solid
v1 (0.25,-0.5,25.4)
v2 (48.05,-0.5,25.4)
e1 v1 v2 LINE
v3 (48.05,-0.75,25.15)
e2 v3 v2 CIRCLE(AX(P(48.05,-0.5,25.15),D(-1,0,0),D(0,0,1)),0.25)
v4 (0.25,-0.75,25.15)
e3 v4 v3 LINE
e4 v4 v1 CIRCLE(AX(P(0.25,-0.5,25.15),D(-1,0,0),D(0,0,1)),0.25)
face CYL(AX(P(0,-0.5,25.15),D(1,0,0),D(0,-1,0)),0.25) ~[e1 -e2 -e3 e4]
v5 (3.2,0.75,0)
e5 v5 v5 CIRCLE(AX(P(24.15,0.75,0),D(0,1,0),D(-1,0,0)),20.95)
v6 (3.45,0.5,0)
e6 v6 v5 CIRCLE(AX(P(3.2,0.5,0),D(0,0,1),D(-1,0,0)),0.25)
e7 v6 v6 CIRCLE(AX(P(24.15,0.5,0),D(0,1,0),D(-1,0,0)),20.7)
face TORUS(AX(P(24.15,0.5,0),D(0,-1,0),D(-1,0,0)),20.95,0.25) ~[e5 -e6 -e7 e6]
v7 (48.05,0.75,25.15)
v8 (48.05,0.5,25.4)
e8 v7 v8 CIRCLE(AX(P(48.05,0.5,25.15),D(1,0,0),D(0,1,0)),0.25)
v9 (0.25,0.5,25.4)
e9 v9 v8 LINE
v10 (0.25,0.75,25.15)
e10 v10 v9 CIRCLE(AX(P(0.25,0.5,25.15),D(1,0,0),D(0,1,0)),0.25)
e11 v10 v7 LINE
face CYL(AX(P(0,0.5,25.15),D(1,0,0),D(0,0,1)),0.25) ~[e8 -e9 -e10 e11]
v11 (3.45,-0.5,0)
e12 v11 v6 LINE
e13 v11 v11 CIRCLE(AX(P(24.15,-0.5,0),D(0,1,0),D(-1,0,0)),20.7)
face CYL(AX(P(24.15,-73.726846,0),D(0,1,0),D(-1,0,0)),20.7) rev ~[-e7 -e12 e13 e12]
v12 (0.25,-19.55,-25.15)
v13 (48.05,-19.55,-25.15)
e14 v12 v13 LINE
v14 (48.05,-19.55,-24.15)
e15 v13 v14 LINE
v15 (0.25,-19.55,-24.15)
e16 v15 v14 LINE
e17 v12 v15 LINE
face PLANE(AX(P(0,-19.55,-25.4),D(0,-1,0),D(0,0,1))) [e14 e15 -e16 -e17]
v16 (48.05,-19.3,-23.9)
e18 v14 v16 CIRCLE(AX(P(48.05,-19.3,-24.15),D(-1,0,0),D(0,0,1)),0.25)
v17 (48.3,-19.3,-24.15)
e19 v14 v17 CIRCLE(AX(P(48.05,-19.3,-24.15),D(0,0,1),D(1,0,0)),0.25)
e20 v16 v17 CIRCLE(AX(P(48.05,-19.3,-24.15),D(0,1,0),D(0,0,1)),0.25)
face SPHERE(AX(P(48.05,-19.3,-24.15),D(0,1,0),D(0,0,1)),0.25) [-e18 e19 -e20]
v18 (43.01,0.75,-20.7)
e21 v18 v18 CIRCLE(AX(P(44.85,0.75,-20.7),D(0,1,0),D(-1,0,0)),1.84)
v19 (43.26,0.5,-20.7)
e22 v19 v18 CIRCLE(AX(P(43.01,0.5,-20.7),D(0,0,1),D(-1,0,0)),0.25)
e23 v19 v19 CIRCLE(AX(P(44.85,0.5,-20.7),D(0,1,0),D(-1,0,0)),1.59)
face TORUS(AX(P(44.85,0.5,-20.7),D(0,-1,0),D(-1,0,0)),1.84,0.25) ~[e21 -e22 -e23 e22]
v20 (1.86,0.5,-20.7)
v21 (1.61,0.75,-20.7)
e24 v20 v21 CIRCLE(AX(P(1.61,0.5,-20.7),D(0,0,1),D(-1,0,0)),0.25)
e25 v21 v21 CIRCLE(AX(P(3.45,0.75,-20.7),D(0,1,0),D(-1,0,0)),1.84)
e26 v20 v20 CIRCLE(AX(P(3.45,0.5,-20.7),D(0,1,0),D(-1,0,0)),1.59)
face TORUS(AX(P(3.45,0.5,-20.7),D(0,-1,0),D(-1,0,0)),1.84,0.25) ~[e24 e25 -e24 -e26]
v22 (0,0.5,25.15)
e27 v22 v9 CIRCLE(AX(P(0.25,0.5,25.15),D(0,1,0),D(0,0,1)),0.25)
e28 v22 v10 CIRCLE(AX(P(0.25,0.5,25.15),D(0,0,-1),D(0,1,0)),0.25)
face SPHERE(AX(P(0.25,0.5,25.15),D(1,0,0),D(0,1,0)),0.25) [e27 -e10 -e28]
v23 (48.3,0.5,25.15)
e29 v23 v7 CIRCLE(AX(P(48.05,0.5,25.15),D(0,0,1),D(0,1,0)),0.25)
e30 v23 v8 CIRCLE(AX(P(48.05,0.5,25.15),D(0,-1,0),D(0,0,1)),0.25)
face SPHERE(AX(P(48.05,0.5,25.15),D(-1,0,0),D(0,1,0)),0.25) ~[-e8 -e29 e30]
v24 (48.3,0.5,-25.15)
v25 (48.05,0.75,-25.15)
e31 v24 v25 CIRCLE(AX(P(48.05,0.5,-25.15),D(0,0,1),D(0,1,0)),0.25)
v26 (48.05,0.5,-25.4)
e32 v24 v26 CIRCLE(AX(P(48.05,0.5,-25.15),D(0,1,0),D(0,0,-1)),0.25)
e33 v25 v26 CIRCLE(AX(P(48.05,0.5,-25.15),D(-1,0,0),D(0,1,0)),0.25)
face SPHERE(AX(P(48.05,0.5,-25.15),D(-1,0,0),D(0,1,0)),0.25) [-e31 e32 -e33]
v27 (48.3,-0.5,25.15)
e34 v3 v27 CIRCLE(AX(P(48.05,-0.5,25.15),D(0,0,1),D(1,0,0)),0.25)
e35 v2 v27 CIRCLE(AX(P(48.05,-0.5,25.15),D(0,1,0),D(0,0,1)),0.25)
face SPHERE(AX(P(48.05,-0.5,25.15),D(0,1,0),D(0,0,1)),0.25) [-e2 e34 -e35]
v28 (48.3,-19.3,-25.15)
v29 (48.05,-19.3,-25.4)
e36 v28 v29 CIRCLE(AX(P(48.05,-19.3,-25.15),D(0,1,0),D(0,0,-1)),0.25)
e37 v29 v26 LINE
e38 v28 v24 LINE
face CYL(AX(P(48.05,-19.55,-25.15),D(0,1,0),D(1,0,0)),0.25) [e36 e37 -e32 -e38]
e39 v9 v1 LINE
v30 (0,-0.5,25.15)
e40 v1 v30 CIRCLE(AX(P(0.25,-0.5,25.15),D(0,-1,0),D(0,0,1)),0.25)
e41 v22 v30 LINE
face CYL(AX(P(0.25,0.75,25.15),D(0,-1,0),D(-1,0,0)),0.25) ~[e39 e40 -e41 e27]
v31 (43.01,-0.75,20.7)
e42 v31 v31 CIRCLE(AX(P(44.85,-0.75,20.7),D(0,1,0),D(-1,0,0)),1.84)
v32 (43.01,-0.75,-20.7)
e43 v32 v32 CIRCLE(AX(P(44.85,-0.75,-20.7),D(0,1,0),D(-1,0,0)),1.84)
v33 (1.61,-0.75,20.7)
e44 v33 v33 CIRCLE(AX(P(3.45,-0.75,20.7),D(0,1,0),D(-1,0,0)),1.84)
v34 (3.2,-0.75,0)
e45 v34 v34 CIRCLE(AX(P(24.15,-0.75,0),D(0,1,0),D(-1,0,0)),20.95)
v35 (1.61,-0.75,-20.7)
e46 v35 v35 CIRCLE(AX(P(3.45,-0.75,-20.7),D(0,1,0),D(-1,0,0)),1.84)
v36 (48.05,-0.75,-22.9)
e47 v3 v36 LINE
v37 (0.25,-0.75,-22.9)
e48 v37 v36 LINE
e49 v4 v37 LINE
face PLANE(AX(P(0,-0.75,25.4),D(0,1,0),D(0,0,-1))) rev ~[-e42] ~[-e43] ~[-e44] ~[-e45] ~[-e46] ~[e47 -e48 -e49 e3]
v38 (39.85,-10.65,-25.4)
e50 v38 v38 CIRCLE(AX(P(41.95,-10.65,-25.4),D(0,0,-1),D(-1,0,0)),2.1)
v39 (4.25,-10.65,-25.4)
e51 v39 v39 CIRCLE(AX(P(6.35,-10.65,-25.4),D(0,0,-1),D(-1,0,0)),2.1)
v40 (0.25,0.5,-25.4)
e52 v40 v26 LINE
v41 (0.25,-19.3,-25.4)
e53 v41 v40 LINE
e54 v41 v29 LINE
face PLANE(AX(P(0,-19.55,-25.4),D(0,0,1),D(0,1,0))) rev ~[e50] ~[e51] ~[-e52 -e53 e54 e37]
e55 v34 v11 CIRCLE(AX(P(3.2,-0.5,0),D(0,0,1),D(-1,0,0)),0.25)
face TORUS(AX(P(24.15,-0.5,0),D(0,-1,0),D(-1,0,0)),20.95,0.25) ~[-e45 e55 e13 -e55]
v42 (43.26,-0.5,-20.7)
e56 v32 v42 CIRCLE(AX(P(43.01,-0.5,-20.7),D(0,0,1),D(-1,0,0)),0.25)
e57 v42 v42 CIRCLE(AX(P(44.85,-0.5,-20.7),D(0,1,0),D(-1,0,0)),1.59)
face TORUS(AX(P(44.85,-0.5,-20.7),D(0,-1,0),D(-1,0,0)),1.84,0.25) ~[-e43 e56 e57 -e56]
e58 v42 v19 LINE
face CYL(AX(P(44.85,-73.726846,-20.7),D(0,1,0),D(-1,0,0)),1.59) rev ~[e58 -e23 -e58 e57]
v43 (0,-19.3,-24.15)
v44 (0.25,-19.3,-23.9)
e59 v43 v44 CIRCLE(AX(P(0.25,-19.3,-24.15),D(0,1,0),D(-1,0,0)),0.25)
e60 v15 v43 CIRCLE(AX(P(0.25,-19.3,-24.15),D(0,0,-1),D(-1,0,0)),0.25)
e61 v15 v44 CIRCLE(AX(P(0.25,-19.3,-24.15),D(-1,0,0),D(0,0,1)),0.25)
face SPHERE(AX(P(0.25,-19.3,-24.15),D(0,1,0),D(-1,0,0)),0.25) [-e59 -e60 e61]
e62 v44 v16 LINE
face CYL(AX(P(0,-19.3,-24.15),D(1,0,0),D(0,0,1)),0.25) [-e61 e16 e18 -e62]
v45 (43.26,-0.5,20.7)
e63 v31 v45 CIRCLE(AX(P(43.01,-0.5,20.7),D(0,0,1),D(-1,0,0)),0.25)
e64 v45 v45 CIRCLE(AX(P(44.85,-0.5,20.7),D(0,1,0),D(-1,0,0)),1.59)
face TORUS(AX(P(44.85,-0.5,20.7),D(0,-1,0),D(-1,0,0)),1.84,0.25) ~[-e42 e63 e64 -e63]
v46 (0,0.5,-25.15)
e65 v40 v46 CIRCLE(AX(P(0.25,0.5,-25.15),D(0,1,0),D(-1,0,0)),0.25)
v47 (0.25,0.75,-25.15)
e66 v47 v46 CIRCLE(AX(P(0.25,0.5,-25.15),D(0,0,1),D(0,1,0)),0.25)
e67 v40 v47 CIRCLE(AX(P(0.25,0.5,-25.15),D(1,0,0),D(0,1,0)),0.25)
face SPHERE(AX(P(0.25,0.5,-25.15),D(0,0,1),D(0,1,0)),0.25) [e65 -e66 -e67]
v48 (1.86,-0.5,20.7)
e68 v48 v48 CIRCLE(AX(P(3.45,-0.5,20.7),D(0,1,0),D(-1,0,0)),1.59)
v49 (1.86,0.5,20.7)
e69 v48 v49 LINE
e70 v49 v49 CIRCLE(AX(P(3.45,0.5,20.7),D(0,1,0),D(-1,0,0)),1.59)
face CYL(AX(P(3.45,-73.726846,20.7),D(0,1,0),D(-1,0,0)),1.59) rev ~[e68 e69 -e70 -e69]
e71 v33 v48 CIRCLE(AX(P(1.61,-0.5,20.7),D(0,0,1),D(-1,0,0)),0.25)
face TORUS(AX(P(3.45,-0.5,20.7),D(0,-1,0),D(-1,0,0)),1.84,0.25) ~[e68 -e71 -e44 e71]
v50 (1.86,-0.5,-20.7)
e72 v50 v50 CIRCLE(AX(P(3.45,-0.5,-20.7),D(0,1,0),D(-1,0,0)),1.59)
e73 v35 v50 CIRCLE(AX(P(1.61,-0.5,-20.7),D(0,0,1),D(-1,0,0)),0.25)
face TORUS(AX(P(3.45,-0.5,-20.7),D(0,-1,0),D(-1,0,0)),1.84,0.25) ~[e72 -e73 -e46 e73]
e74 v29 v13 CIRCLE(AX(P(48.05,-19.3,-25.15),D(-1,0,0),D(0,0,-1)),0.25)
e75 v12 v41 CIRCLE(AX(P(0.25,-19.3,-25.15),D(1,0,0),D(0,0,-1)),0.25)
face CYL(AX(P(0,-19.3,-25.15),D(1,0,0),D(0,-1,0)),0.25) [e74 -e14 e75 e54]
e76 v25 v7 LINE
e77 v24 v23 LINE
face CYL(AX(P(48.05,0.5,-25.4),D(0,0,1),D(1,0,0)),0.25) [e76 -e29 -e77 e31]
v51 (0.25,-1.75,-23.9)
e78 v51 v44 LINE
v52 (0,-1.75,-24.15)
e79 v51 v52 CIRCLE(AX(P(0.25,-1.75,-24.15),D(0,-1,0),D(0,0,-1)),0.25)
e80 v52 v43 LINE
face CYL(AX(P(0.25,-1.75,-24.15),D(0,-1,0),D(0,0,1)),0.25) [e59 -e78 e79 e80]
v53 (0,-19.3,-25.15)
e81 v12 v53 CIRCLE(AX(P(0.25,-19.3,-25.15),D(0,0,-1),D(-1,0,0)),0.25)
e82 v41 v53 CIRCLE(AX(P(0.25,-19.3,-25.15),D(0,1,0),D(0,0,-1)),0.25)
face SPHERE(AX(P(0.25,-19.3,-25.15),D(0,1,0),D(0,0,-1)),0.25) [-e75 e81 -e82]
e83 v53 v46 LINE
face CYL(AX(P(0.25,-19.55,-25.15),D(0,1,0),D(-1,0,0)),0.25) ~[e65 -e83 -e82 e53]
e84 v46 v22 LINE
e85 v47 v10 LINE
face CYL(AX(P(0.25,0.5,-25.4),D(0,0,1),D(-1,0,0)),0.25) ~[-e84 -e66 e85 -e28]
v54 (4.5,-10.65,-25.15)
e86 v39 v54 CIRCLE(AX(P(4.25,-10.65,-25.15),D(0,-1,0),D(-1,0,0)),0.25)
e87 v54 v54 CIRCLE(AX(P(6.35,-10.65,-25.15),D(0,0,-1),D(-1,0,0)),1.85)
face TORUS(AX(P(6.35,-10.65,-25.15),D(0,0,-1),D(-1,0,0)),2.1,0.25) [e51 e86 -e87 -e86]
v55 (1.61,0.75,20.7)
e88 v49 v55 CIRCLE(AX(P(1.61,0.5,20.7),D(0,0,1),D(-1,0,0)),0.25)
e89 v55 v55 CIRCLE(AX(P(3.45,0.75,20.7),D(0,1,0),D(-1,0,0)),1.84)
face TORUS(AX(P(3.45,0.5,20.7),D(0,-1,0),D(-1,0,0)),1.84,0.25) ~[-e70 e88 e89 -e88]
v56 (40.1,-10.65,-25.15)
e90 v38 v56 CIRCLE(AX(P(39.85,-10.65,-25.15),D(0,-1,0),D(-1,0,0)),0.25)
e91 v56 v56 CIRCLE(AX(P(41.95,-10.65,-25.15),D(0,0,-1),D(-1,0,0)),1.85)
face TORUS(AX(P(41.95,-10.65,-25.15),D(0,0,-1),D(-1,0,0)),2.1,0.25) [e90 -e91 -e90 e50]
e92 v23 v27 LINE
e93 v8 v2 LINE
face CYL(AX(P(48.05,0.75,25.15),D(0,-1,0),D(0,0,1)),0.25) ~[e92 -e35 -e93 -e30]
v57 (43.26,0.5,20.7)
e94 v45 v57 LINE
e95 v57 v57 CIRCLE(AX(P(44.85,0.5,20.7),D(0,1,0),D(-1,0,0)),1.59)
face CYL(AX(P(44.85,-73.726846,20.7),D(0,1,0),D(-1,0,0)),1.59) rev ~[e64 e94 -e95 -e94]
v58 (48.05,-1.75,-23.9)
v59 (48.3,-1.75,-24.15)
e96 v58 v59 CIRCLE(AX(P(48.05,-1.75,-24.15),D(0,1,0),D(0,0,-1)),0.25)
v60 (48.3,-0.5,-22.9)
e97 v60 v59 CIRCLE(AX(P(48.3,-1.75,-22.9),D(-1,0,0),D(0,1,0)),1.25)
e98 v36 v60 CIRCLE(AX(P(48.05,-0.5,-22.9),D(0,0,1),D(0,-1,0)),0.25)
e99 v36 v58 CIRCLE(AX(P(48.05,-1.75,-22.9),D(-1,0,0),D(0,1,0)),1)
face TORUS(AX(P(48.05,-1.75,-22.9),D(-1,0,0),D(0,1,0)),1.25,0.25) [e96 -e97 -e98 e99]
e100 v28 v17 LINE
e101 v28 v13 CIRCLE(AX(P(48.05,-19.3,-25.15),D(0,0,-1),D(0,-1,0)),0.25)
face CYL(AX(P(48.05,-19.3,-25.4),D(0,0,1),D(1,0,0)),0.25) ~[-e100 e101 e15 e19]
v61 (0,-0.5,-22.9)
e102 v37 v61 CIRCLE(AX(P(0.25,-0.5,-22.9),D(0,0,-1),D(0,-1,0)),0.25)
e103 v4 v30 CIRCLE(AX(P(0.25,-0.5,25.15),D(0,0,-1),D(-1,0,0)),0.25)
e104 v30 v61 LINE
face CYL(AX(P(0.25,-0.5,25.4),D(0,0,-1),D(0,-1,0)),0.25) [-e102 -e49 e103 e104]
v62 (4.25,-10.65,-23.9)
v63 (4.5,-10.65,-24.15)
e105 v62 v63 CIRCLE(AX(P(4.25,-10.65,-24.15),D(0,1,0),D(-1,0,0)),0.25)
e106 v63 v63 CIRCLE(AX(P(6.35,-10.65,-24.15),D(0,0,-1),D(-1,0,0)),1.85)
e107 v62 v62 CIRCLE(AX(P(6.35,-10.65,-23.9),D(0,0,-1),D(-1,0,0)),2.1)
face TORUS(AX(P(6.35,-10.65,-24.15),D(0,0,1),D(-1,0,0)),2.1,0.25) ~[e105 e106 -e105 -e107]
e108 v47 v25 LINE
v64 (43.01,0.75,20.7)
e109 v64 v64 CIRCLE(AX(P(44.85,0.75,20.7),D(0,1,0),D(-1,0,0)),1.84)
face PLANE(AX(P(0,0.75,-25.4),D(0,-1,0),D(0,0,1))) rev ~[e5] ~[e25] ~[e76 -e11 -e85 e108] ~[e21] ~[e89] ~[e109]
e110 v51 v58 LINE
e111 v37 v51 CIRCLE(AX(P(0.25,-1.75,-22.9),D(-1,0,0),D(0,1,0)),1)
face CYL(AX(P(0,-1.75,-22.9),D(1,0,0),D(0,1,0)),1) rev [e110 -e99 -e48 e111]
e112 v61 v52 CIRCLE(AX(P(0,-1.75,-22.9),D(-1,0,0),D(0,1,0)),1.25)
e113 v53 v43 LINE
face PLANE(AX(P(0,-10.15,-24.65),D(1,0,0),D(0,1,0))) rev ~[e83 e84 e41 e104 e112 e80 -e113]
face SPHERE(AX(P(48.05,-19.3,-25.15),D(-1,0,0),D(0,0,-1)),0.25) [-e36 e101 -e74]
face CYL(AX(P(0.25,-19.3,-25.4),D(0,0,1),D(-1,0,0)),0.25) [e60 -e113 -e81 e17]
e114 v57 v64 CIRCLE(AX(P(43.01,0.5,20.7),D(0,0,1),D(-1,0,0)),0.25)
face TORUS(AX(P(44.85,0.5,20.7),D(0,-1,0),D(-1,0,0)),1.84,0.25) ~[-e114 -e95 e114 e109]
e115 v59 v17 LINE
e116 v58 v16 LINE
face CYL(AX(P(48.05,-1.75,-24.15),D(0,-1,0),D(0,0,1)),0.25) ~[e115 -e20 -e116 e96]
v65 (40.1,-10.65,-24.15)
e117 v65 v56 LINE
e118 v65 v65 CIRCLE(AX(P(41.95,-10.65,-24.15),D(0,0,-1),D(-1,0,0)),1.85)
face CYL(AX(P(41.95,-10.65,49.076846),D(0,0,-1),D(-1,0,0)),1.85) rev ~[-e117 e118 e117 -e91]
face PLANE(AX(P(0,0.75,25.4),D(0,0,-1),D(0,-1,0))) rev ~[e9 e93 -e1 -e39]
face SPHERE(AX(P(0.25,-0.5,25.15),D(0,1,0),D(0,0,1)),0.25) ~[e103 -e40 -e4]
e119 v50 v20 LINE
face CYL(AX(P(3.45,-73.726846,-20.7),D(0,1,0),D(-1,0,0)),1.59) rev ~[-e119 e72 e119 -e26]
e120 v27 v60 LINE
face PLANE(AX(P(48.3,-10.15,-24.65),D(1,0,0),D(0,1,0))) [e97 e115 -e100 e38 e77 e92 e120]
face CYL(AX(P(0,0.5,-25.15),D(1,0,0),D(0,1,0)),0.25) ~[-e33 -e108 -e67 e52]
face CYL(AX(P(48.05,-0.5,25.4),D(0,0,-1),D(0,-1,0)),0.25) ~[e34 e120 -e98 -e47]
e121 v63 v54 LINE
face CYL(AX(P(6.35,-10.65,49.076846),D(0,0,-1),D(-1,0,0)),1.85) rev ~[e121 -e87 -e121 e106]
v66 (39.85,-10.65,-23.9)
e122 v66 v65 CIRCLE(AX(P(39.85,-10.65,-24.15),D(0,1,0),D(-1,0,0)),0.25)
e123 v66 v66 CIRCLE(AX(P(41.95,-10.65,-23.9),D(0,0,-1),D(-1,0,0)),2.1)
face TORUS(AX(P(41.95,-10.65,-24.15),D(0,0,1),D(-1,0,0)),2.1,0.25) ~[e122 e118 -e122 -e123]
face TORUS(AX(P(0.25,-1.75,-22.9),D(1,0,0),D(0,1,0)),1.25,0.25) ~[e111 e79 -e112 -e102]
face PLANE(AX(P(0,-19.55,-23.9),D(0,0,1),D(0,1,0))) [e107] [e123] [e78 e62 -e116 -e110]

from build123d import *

# Parameters (mm, degrees)
F0_W     = 18.8
F0_H     = 1.5
F1_DEPTH = 48.3
F2_R     = 1
F4_D     = 3.18
F6_D     = 3.7
F7_D     = 41.4
F8_R     = 0.25


with BuildPart() as f1:
    # F0 (on Right) → F1 (new body)
    with BuildSketch(Plane.YZ):
        with Locations((-10.15, -24.65)):
            Rectangle(F0_W, F0_H)
        Polygon((0.75, -25.4), (0.75, 25.4), (-0.75, 25.4), (-0.75, -23.9), (-0.75, -25.4), align=None)
    extrude(amount=F1_DEPTH)

    # F2
    f2_edges = [f1.edges().sort_by_distance(p)[0] for p in [
        (24.15, -0.75, -23.9),
    ]]
    fillet(f2_edges, radius=F2_R)

    # F4 (through all)
    with Locations(Plane.XZ.offset(0.75)):
        with Locations((3.45, 20.7), (44.85, 20.7), (44.85, -20.7), (3.45, -20.7)):
            Hole(F4_D / 2)

    # F6 (through all)
    with Locations(Plane.XY.offset(-23.9)):
        with Locations((6.35, -10.65), (41.95, -10.65)):
            Hole(F6_D / 2)

    # F7 (through all)
    with Locations(Plane.XZ.offset(0.75)):
        with Locations((24.15, 0)):
            Hole(F7_D / 2)

    # F8
    f8_edges = [f1.edges().sort_by_distance(p)[0] for p in [
        (24.15, 0.75, 25.4),
        (0, 0.75, 0),
        (24.15, 0.75, -25.4),
        (48.3, 0.75, 0),
        (0, 0, 25.4),
        (48.3, 0, 25.4),
        (24.15, -0.75, 25.4),
        (48.3, -0.75, 1.25),
        (0, -0.75, 1.25),
        (0, -10.65, -23.9),
        (0, -1.042893, -23.607107),
        (48.3, -10.65, -23.9),
        (48.3, -1.042893, -23.607107),
        (0, -9.4, -25.4),
        (24.15, -19.55, -25.4),
        (0, -19.55, -24.65),
        (48.3, -9.4, -25.4),
        (24.15, -19.55, -23.9),
        (48.3, -19.55, -24.65),
        (40.1, -10.65, -23.9),
        (4.5, -10.65, -23.9),
        (40.1, -10.65, -25.4),
        (4.5, -10.65, -25.4),
        (43.26, -0.75, 20.7),
        (43.26, -0.75, -20.7),
        (1.86, -0.75, 20.7),
        (3.45, -0.75, 0),
        (1.86, -0.75, -20.7),
        (43.26, 0.75, -20.7),
        (43.26, 0.75, 20.7),
        (1.86, 0.75, -20.7),
        (3.45, 0.75, 0),
        (1.86, 0.75, 20.7),
    ]]
    fillet(f8_edges, radius=F8_R)


solid = f1.part
